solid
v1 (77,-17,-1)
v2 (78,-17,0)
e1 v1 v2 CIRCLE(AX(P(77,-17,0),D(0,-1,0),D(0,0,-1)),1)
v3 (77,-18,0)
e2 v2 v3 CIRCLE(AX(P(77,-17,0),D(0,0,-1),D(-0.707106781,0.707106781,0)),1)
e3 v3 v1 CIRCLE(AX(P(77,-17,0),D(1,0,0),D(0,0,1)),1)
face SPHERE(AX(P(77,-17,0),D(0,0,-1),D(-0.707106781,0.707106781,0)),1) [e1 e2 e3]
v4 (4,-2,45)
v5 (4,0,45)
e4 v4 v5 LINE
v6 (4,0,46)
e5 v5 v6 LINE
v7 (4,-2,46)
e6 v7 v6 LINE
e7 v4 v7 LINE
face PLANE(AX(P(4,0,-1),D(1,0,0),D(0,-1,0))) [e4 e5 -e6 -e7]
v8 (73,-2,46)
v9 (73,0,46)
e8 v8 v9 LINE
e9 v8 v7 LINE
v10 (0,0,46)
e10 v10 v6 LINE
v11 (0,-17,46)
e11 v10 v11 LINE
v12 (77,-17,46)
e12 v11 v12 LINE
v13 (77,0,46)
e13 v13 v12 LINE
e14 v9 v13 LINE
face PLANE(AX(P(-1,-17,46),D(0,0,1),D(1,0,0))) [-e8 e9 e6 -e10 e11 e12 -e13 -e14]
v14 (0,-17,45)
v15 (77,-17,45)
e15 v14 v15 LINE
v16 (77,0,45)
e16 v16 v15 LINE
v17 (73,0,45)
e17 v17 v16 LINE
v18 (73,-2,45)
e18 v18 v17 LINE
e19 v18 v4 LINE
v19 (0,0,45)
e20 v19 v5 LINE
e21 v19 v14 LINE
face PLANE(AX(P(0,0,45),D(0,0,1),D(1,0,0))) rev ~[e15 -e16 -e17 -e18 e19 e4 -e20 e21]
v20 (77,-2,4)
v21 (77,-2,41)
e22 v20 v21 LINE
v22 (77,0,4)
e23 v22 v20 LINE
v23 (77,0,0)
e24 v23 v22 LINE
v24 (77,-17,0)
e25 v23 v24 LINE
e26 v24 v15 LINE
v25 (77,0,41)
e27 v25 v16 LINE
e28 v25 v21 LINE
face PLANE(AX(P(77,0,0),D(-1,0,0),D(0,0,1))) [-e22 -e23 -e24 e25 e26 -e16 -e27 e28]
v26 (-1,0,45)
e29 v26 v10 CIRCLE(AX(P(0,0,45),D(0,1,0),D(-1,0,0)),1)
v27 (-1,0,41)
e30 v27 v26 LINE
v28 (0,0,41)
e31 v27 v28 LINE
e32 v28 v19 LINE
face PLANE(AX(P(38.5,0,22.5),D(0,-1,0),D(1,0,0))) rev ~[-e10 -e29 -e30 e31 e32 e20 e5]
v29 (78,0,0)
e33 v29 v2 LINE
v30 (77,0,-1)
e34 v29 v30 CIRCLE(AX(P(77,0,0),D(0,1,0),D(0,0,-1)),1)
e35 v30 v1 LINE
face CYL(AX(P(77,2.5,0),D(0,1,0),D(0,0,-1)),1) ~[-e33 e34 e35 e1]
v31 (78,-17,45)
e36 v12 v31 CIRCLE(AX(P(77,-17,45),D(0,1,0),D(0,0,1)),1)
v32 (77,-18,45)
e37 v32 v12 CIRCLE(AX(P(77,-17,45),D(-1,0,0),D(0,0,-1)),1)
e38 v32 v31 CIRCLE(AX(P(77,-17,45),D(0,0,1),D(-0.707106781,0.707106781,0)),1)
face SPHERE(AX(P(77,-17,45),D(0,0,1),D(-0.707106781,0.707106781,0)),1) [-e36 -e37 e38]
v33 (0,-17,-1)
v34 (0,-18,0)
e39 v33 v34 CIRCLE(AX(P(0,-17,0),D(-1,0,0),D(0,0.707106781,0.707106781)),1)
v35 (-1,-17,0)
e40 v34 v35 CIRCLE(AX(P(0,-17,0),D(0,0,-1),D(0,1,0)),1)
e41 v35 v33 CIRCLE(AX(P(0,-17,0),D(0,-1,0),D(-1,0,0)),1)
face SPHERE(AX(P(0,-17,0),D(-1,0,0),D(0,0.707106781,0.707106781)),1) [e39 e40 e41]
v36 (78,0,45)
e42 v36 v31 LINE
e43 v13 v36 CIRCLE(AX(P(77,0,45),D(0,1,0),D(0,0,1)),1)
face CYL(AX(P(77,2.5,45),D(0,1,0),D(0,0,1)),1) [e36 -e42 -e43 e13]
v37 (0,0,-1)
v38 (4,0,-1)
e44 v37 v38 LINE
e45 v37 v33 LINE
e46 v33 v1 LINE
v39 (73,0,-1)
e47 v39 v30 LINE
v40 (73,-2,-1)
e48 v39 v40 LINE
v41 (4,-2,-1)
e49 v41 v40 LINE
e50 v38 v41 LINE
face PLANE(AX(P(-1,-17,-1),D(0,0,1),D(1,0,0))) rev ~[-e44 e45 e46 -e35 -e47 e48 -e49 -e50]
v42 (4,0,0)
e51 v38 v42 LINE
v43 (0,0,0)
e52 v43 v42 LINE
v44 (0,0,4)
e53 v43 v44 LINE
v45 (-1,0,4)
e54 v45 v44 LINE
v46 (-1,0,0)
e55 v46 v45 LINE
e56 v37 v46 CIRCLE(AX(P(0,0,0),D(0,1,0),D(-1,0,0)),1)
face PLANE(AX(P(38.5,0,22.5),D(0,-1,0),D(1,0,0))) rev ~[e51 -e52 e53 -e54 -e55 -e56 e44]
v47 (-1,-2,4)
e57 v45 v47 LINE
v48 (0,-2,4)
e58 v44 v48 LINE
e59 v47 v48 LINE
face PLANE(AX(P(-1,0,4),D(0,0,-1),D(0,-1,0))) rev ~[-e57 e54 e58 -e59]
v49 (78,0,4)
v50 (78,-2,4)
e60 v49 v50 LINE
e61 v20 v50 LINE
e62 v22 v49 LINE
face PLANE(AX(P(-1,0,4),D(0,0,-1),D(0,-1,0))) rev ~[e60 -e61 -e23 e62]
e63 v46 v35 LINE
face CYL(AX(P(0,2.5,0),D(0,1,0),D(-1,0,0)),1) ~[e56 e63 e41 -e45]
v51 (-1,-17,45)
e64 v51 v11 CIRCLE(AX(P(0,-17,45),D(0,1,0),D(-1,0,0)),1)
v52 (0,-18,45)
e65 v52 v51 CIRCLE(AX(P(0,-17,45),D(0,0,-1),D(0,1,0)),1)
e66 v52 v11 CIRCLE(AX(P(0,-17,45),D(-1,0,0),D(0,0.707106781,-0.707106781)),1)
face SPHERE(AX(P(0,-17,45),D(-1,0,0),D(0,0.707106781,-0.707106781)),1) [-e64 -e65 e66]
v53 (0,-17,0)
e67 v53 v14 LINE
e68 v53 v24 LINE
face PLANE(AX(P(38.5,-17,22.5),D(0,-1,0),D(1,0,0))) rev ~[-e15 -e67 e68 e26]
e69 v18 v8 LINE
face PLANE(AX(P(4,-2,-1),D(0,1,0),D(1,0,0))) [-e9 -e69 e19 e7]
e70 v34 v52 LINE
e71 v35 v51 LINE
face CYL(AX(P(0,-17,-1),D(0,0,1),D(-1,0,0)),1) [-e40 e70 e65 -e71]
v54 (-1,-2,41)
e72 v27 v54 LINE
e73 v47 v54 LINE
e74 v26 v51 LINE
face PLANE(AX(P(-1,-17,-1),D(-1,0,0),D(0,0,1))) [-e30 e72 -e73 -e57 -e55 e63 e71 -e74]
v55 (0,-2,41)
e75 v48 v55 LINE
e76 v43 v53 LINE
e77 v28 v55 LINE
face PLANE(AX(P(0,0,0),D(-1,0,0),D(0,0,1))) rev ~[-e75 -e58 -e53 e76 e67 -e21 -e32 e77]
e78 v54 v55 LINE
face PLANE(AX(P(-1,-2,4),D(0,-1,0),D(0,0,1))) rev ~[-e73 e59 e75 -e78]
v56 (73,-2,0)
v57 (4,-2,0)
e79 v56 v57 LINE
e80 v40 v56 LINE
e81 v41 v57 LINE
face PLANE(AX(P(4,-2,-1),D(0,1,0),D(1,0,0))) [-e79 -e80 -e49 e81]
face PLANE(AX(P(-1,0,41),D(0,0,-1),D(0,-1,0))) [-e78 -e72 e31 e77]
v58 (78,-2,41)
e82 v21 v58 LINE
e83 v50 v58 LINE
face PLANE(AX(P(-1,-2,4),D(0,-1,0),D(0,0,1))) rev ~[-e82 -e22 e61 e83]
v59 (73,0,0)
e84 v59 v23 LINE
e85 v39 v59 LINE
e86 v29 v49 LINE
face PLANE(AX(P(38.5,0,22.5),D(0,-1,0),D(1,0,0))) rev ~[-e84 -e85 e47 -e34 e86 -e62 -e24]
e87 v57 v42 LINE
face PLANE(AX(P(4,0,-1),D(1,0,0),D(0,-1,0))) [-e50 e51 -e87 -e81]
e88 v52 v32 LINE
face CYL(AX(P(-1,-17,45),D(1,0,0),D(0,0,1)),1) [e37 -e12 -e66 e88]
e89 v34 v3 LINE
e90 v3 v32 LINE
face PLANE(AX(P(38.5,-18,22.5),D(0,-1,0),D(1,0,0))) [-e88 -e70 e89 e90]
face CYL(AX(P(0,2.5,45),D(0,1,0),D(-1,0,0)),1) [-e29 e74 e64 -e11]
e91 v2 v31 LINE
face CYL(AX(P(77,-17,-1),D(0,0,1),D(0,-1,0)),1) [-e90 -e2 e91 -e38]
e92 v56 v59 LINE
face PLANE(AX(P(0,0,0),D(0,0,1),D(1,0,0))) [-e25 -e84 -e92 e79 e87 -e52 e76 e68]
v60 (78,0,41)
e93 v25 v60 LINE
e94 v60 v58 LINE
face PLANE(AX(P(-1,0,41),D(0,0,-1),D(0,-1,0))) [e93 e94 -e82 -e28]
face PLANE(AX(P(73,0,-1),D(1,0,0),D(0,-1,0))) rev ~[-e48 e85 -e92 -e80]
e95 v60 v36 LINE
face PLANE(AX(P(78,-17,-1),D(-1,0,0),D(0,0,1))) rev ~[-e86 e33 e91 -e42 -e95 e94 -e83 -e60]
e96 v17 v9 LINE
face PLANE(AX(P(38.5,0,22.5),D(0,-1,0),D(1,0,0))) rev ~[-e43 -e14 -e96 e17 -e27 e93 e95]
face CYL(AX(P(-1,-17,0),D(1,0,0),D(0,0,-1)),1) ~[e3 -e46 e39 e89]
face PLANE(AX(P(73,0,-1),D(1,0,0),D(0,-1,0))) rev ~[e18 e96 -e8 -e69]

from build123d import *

# Parameters (mm, degrees)
F0_W         = 79
F0_H         = 47
F0_W_2       = 77
F0_H_2       = 45
F1_DEPTH     = 17
F2_W         = 79
F2_H         = 47
F3_DEPTH     = 1
F4_W         = 2
F4_H         = 37
F5_DEPTH     = 79.001
F6_W         = 69
F6_H         = 2
F7_DEPTH     = 47.001
F8_R         = 1
F9_T1_DEPTH  = 19.5
F9_S5_W      = 1
F9_S5_H      = 1
F9_T6_DEPTH  = 1
F9_S11_W     = 1
F9_S11_H     = 1
F9_T12_DEPTH = 1
F9_S17_W     = 1
F9_S17_H     = 1
F9_T18_DEPTH = 1
F9_S23_W     = 1
F9_S23_H     = 1
F9_T24_DEPTH = 1


# Not quite as in the source:
# - a fillet or chamfer that OpenCascade refuses, or shapes differently, is made with other operations: its cross-section is extruded or revolved along the edge and cut away or added


with BuildPart() as f1:
    # F0 (on Front) → F1 (new body)
    with BuildSketch(Plane.XZ):
        with Locations((38.5, 22.5)):
            Rectangle(F0_W, F0_H)
        with Locations((38.5, 22.5)):
            Rectangle(F0_W_2, F0_H_2, mode=Mode.SUBTRACT)
    extrude(amount=F1_DEPTH)

    # F2 (on face) → F3 (join)
    with BuildSketch(Plane.XZ.offset(17)):
        with Locations((38.5, 22.5)):
            Rectangle(F2_W, F2_H)
    extrude(amount=F3_DEPTH)

    # F4 (on face) → F5 (cut, through all)
    with BuildSketch(Plane(origin=(-1, 0, 0), x_dir=(0, -1, 0), z_dir=(-1, 0, 0))):
        with Locations((1, 22.5)):
            Rectangle(F4_W, F4_H)
    extrude(amount=-F5_DEPTH, mode=Mode.SUBTRACT)

    # F6 (on face) → F7 (cut, through all)
    with BuildSketch(Plane(origin=(0, 0, -1), x_dir=(1, 0, 0), z_dir=(0, 0, -1))):
        with Locations((38.5, 1)):
            Rectangle(F6_W, F6_H)
    extrude(amount=-F7_DEPTH, mode=Mode.SUBTRACT)

    # F8
    f8_edges = [f1.edges().sort_by_distance(p)[0] for p in [
        (38.5, -18, 46),
        (-1, -18, 22.5),
        (38.5, -18, -1),
        (78, -18, 22.5),
    ]]
    fillet(f8_edges, radius=F8_R)

    # F9: fillet of radius 1 on 4 edges, made by hand

    # F9_s2 → F9_t1 (cut)
    with BuildSketch(Plane.XZ.offset(-2.5)):
        with BuildLine():
            ThreePointArc((-1, 45), (-0.7071067812, 45.7071067812), (0, 46))
            Line((0, 46), (-1, 46))
            Line((-1, 46), (-1, 45))
        make_face()
        with BuildLine():
            ThreePointArc((-1, 0), (-0.7071067812, -0.7071067812), (0, -1))
            Line((0, -1), (-1, -1))
            Line((-1, -1), (-1, 0))
        make_face()
        with BuildLine():
            ThreePointArc((77, -1), (77.7071067812, -0.7071067812), (78, 0))
            Line((78, 0), (78, -1))
            Line((78, -1), (77, -1))
        make_face()
        with BuildLine():
            ThreePointArc((77, 46), (77.7071067812, 45.7071067812), (78, 45))
            Line((78, 45), (78, 46))
            Line((78, 46), (77, 46))
        make_face()
    extrude(amount=F9_T1_DEPTH, mode=Mode.SUBTRACT)


with BuildPart() as f9_tool4:
    # F9_s5 → F9_t6 (new body)
    with BuildSketch(Plane.XY.offset(45)):
        with Locations((77.5, -17.5)):
            Rectangle(F9_S5_W, F9_S5_H)
    extrude(amount=F9_T6_DEPTH)

    # F9_s7 → F9_t8 (revolve, cut)
    with BuildSketch(Plane(origin=(77, -17, 45), x_dir=(-0.7071067812, 0.7071067812, 0), z_dir=(0.7071067812, 0.7071067812, 0))):
        with BuildLine():
            ThreePointArc((0, -1), (1, 0), (0, 1))
            Line((0, 1), (0, -1))
        make_face()
    revolve(axis=Axis((77, -17, 45), (0, 0, 1)), mode=Mode.SUBTRACT)


with BuildPart() as f1_1:
    add(f1.part)

    # F9_t3: cut F9_tool4
    add(f9_tool4.part, mode=Mode.SUBTRACT)


with BuildPart() as f9_tool10:
    # F9_s11 → F9_t12 (new body)
    with BuildSketch(Plane.XY):
        with Locations((77.5, -17.5)):
            Rectangle(F9_S11_W, F9_S11_H)
    extrude(amount=-F9_T12_DEPTH)

    # F9_s13 → F9_t14 (revolve, cut)
    with BuildSketch(Plane(origin=(77, -17, 0), x_dir=(-0.7071067812, 0.7071067812, 0), z_dir=(-0.7071067812, -0.7071067812, 0))):
        with BuildLine():
            ThreePointArc((0, -1), (1, 0), (0, 1))
            Line((0, 1), (0, -1))
        make_face()
    revolve(axis=Axis((77, -17, 0), (0, 0, -1)), mode=Mode.SUBTRACT)


with BuildPart() as f1_2:
    add(f1_1.part)

    # F9_t9: cut F9_tool10
    add(f9_tool10.part, mode=Mode.SUBTRACT)


with BuildPart() as f9_tool16:
    # F9_s17 → F9_t18 (new body)
    with BuildSketch(Plane.YZ):
        with Locations((-17.5, -0.5)):
            Rectangle(F9_S17_W, F9_S17_H)
    extrude(amount=-F9_T18_DEPTH)

    # F9_s19 → F9_t20 (revolve, cut)
    with BuildSketch(Plane(origin=(0, -17, 0), x_dir=(0, 0.7071067812, 0.7071067812), z_dir=(0, -0.7071067812, 0.7071067812))):
        with BuildLine():
            ThreePointArc((0, -1), (1, 0), (0, 1))
            Line((0, 1), (0, -1))
        make_face()
    revolve(axis=Axis((0, -17, 0), (-1, 0, 0)), mode=Mode.SUBTRACT)


with BuildPart() as f1_3:
    add(f1_2.part)

    # F9_t15: cut F9_tool16
    add(f9_tool16.part, mode=Mode.SUBTRACT)


with BuildPart() as f9_tool22:
    # F9_s23 → F9_t24 (new body)
    with BuildSketch(Plane.YZ):
        with Locations((-17.5, 45.5)):
            Rectangle(F9_S23_W, F9_S23_H)
    extrude(amount=-F9_T24_DEPTH)

    # F9_s25 → F9_t26 (revolve, cut)
    with BuildSketch(Plane(origin=(0, -17, 45), x_dir=(0, 0.7071067812, -0.7071067812), z_dir=(0, 0.7071067812, 0.7071067812))):
        with BuildLine():
            ThreePointArc((0, -1), (1, 0), (0, 1))
            Line((0, 1), (0, -1))
        make_face()
    revolve(axis=Axis((0, -17, 45), (-1, 0, 0)), mode=Mode.SUBTRACT)


with BuildPart() as f1_4:
    add(f1_3.part)

    # F9_t21: cut F9_tool22
    add(f9_tool22.part, mode=Mode.SUBTRACT)


solid = f1_4.part
